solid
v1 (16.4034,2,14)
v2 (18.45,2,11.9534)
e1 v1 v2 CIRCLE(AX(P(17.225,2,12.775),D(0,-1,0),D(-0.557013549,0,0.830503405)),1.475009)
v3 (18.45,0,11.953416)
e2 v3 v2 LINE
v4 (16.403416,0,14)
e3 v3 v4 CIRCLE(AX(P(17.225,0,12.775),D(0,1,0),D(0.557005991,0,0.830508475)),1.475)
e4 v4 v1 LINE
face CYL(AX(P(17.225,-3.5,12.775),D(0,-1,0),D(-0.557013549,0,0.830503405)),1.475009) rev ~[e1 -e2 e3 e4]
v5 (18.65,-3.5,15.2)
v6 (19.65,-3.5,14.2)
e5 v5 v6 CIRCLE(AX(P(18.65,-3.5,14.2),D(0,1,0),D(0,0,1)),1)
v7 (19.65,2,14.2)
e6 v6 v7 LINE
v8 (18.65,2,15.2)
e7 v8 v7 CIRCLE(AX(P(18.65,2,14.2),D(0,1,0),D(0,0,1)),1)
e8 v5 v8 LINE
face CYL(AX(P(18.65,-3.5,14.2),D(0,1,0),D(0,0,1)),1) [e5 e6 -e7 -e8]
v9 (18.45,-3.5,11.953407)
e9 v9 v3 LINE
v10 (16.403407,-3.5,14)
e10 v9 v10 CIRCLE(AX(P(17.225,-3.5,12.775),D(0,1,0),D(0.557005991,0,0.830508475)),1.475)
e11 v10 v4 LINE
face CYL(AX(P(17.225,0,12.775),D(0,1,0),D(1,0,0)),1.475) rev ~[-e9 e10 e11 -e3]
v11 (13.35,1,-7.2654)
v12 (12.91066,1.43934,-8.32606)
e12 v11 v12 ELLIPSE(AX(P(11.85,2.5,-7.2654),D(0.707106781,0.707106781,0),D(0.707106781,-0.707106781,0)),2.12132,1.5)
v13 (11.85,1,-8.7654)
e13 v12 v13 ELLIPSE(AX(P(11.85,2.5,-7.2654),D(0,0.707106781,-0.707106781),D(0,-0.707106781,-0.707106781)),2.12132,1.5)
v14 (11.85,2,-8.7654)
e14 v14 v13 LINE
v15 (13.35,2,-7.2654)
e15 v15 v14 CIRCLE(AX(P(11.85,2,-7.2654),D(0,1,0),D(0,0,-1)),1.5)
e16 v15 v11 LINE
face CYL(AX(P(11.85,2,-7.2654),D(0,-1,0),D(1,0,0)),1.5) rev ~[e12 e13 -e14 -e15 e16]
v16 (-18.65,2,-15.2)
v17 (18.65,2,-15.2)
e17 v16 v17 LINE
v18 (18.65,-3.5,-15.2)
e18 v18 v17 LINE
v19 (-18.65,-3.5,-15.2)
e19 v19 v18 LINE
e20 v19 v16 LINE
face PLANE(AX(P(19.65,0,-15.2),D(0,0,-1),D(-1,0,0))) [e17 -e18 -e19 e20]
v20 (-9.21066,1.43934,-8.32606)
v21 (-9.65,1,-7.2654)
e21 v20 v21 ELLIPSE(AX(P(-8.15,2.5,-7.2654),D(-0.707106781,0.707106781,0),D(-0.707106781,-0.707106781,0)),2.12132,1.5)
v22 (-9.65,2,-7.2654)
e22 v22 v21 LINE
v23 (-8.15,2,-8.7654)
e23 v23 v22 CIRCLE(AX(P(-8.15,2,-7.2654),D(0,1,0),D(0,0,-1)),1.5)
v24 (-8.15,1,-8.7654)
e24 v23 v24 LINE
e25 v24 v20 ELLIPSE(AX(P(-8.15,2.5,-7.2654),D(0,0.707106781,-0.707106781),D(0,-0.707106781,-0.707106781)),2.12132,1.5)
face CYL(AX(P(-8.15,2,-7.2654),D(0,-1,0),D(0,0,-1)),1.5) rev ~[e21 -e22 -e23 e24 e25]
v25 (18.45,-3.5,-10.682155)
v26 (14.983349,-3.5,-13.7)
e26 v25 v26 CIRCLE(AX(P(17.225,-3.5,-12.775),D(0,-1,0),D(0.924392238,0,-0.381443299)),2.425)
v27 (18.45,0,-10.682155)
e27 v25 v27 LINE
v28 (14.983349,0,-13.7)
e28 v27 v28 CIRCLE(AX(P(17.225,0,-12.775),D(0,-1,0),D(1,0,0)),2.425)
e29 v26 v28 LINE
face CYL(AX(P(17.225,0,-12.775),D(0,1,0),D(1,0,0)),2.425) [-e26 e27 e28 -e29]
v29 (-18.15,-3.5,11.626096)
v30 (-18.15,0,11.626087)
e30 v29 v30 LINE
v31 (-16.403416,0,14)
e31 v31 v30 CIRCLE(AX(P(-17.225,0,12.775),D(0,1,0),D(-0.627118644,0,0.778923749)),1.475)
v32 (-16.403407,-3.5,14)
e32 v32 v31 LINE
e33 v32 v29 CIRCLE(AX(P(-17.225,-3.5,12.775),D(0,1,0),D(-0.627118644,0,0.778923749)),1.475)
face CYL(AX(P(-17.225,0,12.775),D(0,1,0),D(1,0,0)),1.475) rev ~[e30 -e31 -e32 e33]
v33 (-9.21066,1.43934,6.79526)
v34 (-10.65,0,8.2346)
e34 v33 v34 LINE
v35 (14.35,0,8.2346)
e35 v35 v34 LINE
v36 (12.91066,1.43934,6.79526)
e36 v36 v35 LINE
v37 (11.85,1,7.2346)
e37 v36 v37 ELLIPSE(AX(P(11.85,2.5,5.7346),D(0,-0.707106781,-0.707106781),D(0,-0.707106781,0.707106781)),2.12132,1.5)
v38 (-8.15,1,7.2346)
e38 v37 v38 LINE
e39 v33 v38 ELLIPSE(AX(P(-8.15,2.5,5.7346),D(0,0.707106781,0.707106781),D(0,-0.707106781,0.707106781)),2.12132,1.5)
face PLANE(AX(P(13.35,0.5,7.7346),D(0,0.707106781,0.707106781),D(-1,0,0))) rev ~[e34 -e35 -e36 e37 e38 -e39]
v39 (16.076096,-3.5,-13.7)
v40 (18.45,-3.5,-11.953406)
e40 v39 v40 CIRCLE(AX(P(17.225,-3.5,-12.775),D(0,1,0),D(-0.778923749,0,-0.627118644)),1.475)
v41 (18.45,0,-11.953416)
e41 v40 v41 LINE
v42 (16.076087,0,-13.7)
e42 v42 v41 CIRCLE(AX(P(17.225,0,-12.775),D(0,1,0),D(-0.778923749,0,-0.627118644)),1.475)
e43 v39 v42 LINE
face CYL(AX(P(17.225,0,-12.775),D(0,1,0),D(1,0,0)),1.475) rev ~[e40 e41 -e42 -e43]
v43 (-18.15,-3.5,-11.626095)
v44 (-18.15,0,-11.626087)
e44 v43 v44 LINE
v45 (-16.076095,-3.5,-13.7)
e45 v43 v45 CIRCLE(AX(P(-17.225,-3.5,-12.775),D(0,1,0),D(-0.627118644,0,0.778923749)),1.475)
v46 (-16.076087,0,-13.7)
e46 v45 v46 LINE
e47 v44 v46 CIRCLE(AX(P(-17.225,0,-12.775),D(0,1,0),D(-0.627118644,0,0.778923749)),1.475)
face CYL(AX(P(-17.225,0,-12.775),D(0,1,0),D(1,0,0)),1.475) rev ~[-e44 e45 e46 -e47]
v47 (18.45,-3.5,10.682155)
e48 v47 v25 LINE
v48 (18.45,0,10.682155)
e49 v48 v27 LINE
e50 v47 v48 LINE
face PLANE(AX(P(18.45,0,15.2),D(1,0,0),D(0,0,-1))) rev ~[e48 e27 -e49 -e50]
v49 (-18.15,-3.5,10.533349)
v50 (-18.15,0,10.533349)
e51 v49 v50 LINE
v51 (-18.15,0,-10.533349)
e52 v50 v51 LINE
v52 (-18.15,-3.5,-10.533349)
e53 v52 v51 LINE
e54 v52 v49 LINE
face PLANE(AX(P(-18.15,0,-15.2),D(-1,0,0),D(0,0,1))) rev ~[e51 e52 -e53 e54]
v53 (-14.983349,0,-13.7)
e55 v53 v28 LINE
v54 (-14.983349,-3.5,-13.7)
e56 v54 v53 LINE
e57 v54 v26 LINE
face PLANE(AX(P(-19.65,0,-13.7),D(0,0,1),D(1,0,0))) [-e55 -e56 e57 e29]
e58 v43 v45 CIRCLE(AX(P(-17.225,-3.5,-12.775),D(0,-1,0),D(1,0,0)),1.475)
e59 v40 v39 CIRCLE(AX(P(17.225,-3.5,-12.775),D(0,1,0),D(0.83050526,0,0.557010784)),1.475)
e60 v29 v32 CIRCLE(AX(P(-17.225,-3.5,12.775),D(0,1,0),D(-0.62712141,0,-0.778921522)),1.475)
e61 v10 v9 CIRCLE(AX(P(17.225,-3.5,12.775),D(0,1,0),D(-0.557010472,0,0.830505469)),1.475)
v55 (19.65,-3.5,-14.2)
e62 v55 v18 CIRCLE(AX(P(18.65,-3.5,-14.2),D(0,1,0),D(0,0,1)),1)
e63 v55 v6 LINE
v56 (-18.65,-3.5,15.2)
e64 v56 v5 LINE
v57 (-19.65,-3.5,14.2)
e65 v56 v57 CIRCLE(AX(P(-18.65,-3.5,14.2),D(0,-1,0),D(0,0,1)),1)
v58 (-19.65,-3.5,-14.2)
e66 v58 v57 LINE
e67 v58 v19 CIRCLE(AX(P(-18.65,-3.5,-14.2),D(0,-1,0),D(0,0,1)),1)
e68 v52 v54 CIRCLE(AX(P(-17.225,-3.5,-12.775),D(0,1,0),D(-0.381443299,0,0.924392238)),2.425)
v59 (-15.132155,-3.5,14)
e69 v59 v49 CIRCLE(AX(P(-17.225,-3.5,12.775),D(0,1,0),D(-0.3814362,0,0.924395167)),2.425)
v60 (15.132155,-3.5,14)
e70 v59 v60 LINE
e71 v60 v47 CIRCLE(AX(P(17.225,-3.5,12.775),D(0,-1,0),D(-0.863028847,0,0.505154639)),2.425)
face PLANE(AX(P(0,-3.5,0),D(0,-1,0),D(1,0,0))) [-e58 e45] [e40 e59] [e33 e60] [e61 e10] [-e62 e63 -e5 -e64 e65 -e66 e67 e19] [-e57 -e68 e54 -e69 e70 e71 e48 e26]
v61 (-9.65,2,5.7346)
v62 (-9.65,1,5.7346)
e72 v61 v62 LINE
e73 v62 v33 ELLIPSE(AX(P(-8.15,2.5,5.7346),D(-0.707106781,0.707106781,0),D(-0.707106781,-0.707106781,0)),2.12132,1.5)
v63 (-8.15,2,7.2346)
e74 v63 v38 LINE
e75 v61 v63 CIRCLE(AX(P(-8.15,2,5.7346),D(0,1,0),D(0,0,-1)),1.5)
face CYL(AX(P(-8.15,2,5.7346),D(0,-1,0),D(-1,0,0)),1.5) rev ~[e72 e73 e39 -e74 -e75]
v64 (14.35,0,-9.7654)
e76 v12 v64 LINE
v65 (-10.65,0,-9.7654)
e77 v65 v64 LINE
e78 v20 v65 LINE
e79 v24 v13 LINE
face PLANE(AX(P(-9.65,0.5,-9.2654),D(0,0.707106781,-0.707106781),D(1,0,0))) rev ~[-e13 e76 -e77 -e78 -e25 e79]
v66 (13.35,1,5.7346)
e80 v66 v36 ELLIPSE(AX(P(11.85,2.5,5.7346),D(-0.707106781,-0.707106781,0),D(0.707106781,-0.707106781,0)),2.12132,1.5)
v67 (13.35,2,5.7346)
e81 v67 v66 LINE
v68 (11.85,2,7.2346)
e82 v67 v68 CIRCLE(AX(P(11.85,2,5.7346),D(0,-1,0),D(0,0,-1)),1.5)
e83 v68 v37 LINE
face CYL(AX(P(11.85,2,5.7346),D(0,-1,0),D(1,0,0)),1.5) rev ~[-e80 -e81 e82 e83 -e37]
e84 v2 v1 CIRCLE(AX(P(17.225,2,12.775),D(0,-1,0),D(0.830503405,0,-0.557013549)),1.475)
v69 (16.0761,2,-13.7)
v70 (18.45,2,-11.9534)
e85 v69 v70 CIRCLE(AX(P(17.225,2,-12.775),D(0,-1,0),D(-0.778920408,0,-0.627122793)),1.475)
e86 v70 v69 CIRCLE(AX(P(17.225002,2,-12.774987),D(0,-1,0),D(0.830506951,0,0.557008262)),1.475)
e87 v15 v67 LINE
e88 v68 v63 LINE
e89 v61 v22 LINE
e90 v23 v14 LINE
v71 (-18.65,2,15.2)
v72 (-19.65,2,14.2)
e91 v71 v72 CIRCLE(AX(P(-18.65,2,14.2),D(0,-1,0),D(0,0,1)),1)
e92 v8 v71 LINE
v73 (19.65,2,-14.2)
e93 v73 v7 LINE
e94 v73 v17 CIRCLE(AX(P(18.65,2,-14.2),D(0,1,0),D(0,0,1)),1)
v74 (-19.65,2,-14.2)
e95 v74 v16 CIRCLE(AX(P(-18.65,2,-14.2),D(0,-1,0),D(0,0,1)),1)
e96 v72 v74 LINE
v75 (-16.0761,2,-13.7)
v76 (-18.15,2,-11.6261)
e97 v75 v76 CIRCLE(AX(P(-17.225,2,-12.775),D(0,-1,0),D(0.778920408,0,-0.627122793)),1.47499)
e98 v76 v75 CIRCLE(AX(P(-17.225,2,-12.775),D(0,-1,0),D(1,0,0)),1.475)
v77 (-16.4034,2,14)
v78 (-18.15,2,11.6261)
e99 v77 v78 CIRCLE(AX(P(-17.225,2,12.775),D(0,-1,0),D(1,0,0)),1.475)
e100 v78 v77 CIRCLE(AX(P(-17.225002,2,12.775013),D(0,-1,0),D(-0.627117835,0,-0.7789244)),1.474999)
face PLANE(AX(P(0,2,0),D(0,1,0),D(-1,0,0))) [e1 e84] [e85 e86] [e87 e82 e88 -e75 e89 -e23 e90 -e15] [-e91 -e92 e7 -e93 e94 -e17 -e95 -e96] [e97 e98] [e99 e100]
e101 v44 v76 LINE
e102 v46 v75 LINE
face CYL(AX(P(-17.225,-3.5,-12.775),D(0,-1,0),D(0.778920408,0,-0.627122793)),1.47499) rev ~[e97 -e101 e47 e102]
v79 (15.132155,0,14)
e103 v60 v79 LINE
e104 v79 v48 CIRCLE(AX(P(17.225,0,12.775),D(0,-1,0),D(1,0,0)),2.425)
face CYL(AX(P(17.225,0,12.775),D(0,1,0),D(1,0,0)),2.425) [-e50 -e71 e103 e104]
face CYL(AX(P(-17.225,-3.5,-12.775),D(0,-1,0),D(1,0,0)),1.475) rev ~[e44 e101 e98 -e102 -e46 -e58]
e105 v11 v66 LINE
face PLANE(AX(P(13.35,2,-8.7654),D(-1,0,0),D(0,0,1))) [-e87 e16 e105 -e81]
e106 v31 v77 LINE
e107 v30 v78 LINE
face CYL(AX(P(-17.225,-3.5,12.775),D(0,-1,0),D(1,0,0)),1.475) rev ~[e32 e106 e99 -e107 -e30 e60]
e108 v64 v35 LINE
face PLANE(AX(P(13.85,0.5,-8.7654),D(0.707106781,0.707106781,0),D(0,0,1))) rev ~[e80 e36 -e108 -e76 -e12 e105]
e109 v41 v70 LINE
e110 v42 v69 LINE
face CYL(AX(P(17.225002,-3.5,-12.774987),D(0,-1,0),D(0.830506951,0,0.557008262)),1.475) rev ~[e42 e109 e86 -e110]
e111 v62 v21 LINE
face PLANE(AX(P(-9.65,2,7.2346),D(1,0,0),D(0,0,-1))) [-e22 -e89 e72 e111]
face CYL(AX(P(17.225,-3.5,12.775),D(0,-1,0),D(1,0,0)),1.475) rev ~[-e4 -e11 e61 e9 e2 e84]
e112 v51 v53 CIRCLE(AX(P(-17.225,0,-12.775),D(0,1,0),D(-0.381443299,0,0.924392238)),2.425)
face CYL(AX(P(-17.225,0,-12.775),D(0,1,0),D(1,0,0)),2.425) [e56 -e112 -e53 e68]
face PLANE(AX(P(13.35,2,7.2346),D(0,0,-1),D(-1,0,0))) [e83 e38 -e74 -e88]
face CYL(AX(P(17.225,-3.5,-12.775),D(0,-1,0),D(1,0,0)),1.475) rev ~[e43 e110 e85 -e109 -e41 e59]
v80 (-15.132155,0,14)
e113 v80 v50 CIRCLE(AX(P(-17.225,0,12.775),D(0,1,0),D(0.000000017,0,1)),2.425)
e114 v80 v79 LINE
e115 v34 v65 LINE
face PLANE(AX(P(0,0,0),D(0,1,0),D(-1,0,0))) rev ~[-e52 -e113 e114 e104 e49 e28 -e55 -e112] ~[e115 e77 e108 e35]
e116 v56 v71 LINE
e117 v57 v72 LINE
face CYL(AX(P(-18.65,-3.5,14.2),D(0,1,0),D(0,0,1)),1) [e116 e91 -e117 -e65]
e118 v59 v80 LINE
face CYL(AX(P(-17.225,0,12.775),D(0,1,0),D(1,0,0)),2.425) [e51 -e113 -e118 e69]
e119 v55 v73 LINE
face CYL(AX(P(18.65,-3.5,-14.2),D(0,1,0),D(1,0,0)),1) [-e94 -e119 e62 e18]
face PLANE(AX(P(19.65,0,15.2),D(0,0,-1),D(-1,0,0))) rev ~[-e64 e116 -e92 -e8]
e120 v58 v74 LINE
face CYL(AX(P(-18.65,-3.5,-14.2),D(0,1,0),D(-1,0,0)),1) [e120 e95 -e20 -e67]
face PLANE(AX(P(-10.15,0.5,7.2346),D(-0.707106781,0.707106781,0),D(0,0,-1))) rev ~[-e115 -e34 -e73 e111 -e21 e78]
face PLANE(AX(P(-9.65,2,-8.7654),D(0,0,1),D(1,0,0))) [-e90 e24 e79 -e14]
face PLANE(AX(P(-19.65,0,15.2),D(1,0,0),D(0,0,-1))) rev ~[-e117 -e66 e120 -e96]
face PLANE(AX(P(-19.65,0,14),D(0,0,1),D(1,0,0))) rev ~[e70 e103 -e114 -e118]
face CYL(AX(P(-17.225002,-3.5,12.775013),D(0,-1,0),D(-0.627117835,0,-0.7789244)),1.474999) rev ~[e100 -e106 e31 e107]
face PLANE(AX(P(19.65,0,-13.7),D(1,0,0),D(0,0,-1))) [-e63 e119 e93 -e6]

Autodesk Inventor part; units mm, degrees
ref_plane "YZ Plane" through (0, 0, 0) normal (1, 0, 0) x (0, 1, 0)
ref_plane "XZ Plane" through (0, 0, 0) normal (0, 1, 0) x (-1, 0, 0)
ref_plane "XY Plane" through (0, 0, 0) normal (0, 0, 1) x (1, 0, 0)
sketch "Sketch1" plane through (0, 0, 0) normal (0, 1, 0) x (-1, 0, 0)
  line L0 (-19.65, 15.2) -> (19.65, 15.2)
  line L1 (19.65, 15.2) -> (19.65, -15.2)
  line L2 (19.65, -15.2) -> (-19.65, -15.2)
  line L3 (-19.65, -15.2) -> (-19.65, 15.2)
  line L4 (-19.65, 15.2) -> (19.65, -15.2) construction
  line L5 (19.65, 15.2) -> (-19.65, -15.2) construction
  point P0 (0, 0)
  dimension "d0" = 30.4
  dimension "d1" = 39.3
extrude "Extrusion1" add sketch "Sketch1" along normal blind 2
sketch "Sketch2" plane through (0, 0, 0) normal (0, -1, 0) x (1, 0, 0)
  circle A0 centre (-17.225, -12.775) radius 2.425
  circle A1 centre (-17.225, -12.775) radius 1.475
  line L0 (-19.65, -15.2) -> (19.65, -15.2) projected
  line L1 (-19.65, 15.2) -> (-19.65, -15.2) projected
  circle A2 centre (-17.225, 12.775) radius 1.475
  circle A3 centre (-17.225, 12.775) radius 2.425
  circle A4 centre (17.225, 12.775) radius 1.475
  circle A5 centre (17.225, 12.775) radius 2.425
  circle A6 centre (17.225, -12.775) radius 1.475
  circle A7 centre (17.225, -12.775) radius 2.425
  line L2 (19.65, 15.2) -> (-19.65, 15.2) projected
  line L3 (19.65, -15.2) -> (19.65, 15.2) projected
  point P0 (0, 0)
  dimension "d4" = 0.95
  dimension "d5" = 2.95
  dimension "d6" = 2.95
  dimension "d7" = 0.95
  dimension "d8" = 2.95
  dimension "d9" = 0.95
  dimension "d10" = 2.95
  dimension "d11" = 0.95
  dimension "d12" = 39.3
extrude "Extrusion3" add sketch "Sketch2" along normal blind 3.5 contours A0 | A3 | A7 | A5
sketch "Sketch3" plane through (0, 0, 0) normal (0, -1, 0) x (1, 0, 0)
  line L0 (-19.65, -15.2) -> (-17.225, -15.2) projected
  circle A0 centre (-17.225, 12.775) radius 2.425 projected
  line L1 (-19.65, -15.2) -> (-18.15, -15.2)
  line L2 (-18.15, -15.2) -> (-18.15, 15.0167)
  line L3 (-18.15, 15.0167) -> (-19.65, 15.0167)
  line L4 (-19.65, 15.0167) -> (-19.65, -15.2)
  point P0 (0, 0)
  dimension "d17" = 1.5
extrude "Extrusion4" add sketch "Sketch3" along normal up to surface (3.5 mm away) contours L4 A0 L2 L0 | L4 L3 A0 | A0 L2 picked at (-18.7278, 13.0496)
sketch "Sketch4" plane through (0, 0, 0) normal (0, -1, 0) x (1, 0, 0)
  line L0 (19.65, -15.2) -> (-19.65, -15.2) projected
  line L1 (-19.65, -15.2) -> (-19.65, 15.2) projected
  line L2 (19.65, -15.2) -> (-19.65, -15.2)
  line L3 (-19.65, -15.2) -> (-19.65, -13.7)
  line L4 (-19.65, -13.7) -> (19.65, -13.7)
  line L5 (19.65, -13.7) -> (19.65, -15.2)
  point P0 (0, 0)
  dimension "d20" = 1.5
extrude "Extrusion5" add sketch "Sketch4" along normal up to surface (3.5 mm away)
sketch "Sketch5" plane through (0, 0, 0) normal (0, -1, 0) x (1, 0, 0)
  line L0 (-19.65, 15.0167) -> (-19.65, -15.2) projected
  line L1 (19.65, 15.2) -> (-19.65, 15.2)
  line L2 (-19.65, 15.2) -> (-19.65, 14)
  line L3 (-19.65, 14) -> (19.65, 14)
  line L4 (19.65, 14) -> (19.65, 15.2)
  point P0 (0, 0)
  dimension "d23" = 1.2
extrude "Extrusion6" add sketch "Sketch5" along normal up to surface (3.5 mm away)
sketch "Sketch6" plane through (0, 0, 0) normal (0, -1, 0) x (1, 0, 0)
  line L0 (-19.65, 15.2) -> (19.65, 15.2) projected
  line L1 (19.65, -15.2) -> (-19.65, -15.2) projected
  line L2 (19.65, 15.2) -> (18.45, 15.2)
  line L3 (18.45, 15.2) -> (18.45, -15.2)
  line L4 (18.45, -15.2) -> (19.65, -15.2)
  line L5 (19.65, -15.2) -> (19.65, 15.2)
  dimension "d27" = 1.2
extrude "Extrusion7" add sketch "Sketch6" along normal up to surface (3.5 mm away)
sketch "Sketch7" plane through (0, -3.5, 0) normal (0, -1, 0) x (1, 0, 0)
  arc A0 (16.4034, 14) -> (18.45, 11.9534) centre (17.225, 12.775) ccw projected
  circle A1 centre (17.225, 12.775) radius 1.475
  arc A2 (18.45, -11.9534) -> (16.0761, -13.7) centre (17.225, -12.775) ccw projected
  circle A3 centre (17.225, -12.775) radius 1.475
  arc A4 (-16.0761, -13.7) -> (-18.15, -11.6261) centre (-17.225, -12.775) ccw projected
  circle A5 centre (-17.225, -12.775) radius 1.475
  arc A6 (-18.15, 11.6261) -> (-16.4034, 14) centre (-17.225, 12.775) ccw projected
  circle A7 centre (-17.225, 12.775) radius 1.475
  point P0 (0, 0)
extrude "Extrusion8" cut sketch "Sketch7" against normal up to surface (5.5 mm away)
sketch "Sketch8" plane through (0, 2, 0) normal (0, 1, 0) x (1, 0, 0)
  line L0 (13.35, -7.2346) -> (-9.65, -7.2346)
  line L1 (-9.65, -7.2346) -> (-9.65, 8.7654)
  line L2 (-9.65, 8.7654) -> (13.35, 8.7654)
  line L3 (13.35, 8.7654) -> (13.35, -7.2346)
  line L4 (13.35, -7.2346) -> (-9.65, 8.7654) construction
  line L5 (-9.65, -7.2346) -> (13.35, 8.7654) construction
  line L6 (-19.65, 15.2) -> (-19.65, -15.2) projected
  point P0 (0, 0)
  point P1 (1.85, 0.7654)
  dimension "d34" = 23
  dimension "d35" = 10
  dimension "d40" = 16
extrude "Extrusion9" cut sketch "Sketch8" against normal up to surface (2 mm away)
chamfer "Chamfer1" distance 1 angle 45 4 edges at (-9.65, 0, -0.7654) (1.85, 0, 7.2346) (13.35, 0, -0.7654) (1.85, 0, -8.7654)
fillet "Fillet2" radius 1 4 edges at (-19.65, -0.75, 15.2) (19.65, -0.75, 15.2) (19.65, -0.75, -15.2) (-19.65, -0.75, -15.2)
fillet "Fillet3" radius 1.5 4 edges at (13.35, 1.5, -8.7654) (-9.65, 1.5, -8.7654) (-9.65, 1.5, 7.2346) (13.35, 1.5, 7.2346)
properties part number "Enclosure_Lid"
